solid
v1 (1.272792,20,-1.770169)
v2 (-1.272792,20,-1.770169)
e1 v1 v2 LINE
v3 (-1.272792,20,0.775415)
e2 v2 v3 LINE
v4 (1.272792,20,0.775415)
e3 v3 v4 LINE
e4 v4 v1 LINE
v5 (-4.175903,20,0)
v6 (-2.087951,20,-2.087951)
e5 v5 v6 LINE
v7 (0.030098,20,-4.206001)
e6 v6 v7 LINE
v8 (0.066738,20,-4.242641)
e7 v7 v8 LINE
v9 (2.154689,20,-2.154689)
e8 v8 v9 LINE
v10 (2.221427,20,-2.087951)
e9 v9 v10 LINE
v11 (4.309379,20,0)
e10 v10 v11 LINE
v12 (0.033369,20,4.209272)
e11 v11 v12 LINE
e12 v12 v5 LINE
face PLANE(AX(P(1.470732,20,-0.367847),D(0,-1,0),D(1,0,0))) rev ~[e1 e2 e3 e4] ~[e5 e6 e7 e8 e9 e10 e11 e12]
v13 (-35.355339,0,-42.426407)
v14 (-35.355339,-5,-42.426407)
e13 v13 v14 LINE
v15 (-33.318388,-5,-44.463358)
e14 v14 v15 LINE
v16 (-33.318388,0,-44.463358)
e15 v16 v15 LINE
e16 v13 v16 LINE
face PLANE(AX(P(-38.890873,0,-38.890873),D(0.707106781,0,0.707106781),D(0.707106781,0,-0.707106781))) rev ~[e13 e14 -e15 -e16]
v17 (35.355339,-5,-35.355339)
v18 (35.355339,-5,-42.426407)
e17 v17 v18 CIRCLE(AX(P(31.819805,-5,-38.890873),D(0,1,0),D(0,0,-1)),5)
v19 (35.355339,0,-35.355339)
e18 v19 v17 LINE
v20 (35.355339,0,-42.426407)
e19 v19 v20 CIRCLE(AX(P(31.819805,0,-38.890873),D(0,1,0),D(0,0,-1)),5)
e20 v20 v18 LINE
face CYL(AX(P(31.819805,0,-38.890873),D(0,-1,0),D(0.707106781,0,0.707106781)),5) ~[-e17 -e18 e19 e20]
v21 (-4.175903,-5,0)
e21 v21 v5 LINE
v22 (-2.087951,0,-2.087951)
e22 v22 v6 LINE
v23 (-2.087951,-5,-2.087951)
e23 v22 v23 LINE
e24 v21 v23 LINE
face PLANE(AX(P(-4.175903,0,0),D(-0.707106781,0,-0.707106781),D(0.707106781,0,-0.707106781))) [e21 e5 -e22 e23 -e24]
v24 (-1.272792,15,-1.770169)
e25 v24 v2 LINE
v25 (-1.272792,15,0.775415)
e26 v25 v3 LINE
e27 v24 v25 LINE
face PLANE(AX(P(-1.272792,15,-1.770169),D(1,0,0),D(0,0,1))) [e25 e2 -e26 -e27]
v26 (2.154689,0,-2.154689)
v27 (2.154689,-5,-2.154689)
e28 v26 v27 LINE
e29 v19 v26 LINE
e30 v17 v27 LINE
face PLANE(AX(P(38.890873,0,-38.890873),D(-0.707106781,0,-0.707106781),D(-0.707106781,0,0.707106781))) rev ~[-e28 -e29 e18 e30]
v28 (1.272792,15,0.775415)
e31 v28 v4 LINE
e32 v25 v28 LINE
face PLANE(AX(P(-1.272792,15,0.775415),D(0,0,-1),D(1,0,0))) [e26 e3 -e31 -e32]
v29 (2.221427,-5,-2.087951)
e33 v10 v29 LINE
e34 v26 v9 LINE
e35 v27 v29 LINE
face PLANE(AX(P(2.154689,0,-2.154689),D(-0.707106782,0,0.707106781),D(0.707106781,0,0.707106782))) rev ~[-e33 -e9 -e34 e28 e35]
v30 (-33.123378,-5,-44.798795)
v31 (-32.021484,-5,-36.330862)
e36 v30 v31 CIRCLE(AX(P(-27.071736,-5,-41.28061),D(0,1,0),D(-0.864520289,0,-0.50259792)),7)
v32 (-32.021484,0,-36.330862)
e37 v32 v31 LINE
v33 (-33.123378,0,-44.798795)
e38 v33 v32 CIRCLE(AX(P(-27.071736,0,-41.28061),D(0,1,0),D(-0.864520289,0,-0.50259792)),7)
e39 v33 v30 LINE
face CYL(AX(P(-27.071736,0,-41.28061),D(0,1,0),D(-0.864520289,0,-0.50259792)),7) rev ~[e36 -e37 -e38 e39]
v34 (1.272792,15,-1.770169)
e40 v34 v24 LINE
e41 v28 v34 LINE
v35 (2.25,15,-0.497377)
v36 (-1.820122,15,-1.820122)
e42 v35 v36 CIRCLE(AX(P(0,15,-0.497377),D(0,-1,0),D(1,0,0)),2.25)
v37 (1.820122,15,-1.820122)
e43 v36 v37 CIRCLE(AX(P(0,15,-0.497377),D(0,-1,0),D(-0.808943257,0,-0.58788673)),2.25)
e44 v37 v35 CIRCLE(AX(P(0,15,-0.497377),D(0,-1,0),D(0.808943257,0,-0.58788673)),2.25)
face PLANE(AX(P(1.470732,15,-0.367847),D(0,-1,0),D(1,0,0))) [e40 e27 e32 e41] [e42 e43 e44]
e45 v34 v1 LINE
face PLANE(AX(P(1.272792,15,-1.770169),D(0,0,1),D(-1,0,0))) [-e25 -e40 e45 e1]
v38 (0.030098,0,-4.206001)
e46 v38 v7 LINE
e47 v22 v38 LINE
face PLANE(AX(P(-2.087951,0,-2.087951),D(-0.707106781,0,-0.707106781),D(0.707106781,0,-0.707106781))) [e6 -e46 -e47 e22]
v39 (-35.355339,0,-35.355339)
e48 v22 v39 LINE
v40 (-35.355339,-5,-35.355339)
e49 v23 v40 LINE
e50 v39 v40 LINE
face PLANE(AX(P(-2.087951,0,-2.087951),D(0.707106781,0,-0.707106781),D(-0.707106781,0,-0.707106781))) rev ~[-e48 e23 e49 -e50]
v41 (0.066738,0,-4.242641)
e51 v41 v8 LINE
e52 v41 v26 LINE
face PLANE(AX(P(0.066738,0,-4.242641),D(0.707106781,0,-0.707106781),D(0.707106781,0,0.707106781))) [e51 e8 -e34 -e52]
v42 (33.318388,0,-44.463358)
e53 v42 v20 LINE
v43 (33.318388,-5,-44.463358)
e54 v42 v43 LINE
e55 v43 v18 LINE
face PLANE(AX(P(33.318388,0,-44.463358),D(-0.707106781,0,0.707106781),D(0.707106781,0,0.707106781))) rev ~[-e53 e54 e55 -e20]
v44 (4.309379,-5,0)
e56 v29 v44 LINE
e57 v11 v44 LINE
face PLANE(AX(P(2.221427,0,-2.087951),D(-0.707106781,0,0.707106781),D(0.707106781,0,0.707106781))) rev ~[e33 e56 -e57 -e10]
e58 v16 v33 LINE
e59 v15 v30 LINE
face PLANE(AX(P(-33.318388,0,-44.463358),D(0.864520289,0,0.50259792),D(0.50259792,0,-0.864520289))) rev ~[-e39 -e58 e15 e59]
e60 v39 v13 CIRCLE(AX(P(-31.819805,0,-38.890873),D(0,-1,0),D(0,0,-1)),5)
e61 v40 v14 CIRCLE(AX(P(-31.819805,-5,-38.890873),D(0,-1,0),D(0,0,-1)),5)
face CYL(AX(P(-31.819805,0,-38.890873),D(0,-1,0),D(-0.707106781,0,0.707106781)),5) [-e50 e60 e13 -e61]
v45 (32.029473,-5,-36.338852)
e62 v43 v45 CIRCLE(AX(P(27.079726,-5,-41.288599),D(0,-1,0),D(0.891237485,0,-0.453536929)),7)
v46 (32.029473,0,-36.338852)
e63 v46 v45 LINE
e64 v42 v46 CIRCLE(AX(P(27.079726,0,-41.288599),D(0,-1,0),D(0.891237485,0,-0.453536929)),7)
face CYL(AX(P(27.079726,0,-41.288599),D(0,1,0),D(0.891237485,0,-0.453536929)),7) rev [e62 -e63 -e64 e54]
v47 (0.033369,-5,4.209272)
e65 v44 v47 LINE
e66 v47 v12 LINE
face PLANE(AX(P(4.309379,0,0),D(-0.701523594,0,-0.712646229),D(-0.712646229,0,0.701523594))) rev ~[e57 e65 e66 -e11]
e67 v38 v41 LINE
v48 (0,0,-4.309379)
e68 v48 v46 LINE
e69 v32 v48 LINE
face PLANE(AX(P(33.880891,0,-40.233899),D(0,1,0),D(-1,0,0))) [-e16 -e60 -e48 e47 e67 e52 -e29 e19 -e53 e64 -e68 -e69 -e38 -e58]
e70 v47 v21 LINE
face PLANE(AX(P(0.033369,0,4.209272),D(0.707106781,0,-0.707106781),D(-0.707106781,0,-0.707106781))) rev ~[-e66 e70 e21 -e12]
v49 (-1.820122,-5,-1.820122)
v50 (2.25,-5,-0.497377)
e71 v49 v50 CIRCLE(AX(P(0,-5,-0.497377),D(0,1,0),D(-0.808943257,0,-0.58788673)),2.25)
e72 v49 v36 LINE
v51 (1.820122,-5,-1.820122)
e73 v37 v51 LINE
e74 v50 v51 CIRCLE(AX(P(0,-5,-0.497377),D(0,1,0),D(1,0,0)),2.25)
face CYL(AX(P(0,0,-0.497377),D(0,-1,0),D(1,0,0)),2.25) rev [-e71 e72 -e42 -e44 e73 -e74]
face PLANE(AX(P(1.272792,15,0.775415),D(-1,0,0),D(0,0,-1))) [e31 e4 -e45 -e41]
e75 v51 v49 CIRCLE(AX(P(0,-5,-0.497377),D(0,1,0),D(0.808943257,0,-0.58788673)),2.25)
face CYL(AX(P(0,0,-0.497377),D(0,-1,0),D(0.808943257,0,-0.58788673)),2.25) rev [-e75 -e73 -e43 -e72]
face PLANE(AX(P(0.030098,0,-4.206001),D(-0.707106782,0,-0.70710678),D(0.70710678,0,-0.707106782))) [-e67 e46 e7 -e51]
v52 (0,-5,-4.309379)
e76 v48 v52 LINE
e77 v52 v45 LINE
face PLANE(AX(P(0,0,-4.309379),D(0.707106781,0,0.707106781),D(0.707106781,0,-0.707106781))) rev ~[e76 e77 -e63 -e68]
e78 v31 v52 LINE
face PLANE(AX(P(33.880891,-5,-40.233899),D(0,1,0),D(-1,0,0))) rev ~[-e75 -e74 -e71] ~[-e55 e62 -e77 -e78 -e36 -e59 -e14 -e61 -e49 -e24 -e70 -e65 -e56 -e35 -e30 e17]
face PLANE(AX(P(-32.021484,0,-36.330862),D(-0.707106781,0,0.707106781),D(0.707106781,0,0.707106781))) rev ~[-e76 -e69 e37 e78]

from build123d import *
from build123d import SkipClean  # not in build123d's __all__

# Parameters (mm, degrees)
F1_DEPTH    = 5
F2_DEPTH    = 20
F3_R        = 5
F4_START    = -15
F4_DEPTH    = 5
F5_T1_DEPTH = 5


# Not quite as in the source:
# - a fillet or chamfer that OpenCascade refuses, or shapes differently, is made with other operations: its cross-section is extruded or revolved along the edge and cut away or added
# - after a boolean that leaves OpenCascade's solid faulty, fix() repairs it
# - a feature names something its author has since deleted; it is built from what else it names


with BuildPart() as f1:
    # F0 (on Front) → F1 (new body)
    with BuildSketch(Plane.XZ):
        with BuildLine():
            Line((0.0300982685, -4.2060010783), (-2.0879514049, -2.0879514049))
            Line((-2.0879514049, -2.0879514049), (-38.8908729653, -38.8908729653))
            Line((-38.8908729653, -38.8908729653), (-33.3183881591, -44.4633577714))
            Line((-33.3183881591, -44.4633577714), (-33.1233781652, -44.7987950851))
            ThreePointArc((-33.1233781652, -44.7987950851), (-34.0132139837, -40.3773459148), (-32.0214836094, -36.3308621737))
            Line((-32.0214836094, -36.3308621737), (0, -4.3093785644))
            Line((0, -4.3093785644), (0.0667378772, -4.2426406871))
            Line((0.0667378772, -4.2426406871), (0.0300982685, -4.2060010783))
        make_face()
        with BuildLine():
            Line((-4.1759028099, 0), (-2.0879514049, -2.0879514049))
            Line((-2.0879514049, -2.0879514049), (-1.8201223283, -1.8201223283))
            ThreePointArc((-1.8201223283, -1.8201223283), (-0.6954224476, 1.6424563629), (2.25, -0.4973771865))
            ThreePointArc((2.25, -0.4973771865), (2.1398335494, -1.1927996342), (1.8201223283, -1.8201223283))
            Line((1.8201223283, -1.8201223283), (2.1546892822, -2.1546892822))
            Line((2.1546892822, -2.1546892822), (2.2214271594, -2.0879514049))
            Line((2.2214271594, -2.0879514049), (4.3093785644, 0))
            Line((4.3093785644, 0), (0.0333689386, 4.2092717485))
            Line((0.0333689386, 4.2092717485), (-4.1759028099, 0))
        make_face()
        with BuildLine():
            Line((-1.8201223283, -1.8201223283), (-2.0879514049, -2.0879514049))
            Line((-2.0879514049, -2.0879514049), (0.0300982685, -4.2060010783))
            Line((0.0300982685, -4.2060010783), (0.0667378772, -4.2426406871))
            Line((0.0667378772, -4.2426406871), (2.1546892822, -2.1546892822))
            Line((2.1546892822, -2.1546892822), (1.8201223283, -1.8201223283))
            ThreePointArc((1.8201223283, -1.8201223283), (0, -2.7473771865), (-1.8201223283, -1.8201223283))
        make_face()
        Polygon((2.1546892822, -2.1546892822), (0.0667378772, -4.2426406871), (0, -4.3093785644), (35.8313777613, -40.1407563256), (33.3183881591, -44.4633577714), (38.8908729653, -38.8908729653), align=None)
    extrude(amount=F1_DEPTH)

    # F0 (on Front) → F2 (join)
    with BuildSketch(Plane.XZ):
        with BuildLine():
            Line((-4.1759028099, 0), (-2.0879514049, -2.0879514049))
            Line((-2.0879514049, -2.0879514049), (-1.8201223283, -1.8201223283))
            ThreePointArc((-1.8201223283, -1.8201223283), (-0.6954224476, 1.6424563629), (2.25, -0.4973771865))
            ThreePointArc((2.25, -0.4973771865), (2.1398335494, -1.1927996342), (1.8201223283, -1.8201223283))
            Line((1.8201223283, -1.8201223283), (2.1546892822, -2.1546892822))
            Line((2.1546892822, -2.1546892822), (2.2214271594, -2.0879514049))
            Line((2.2214271594, -2.0879514049), (4.3093785644, 0))
            Line((4.3093785644, 0), (0.0333689386, 4.2092717485))
            Line((0.0333689386, 4.2092717485), (-4.1759028099, 0))
        make_face()
        with BuildLine():
            Line((-1.8201223283, -1.8201223283), (-2.0879514049, -2.0879514049))
            Line((-2.0879514049, -2.0879514049), (0.0300982685, -4.2060010783))
            Line((0.0300982685, -4.2060010783), (0.0667378772, -4.2426406871))
            Line((0.0667378772, -4.2426406871), (2.1546892822, -2.1546892822))
            Line((2.1546892822, -2.1546892822), (1.8201223283, -1.8201223283))
            ThreePointArc((1.8201223283, -1.8201223283), (0, -2.7473771865), (-1.8201223283, -1.8201223283))
        make_face()
    with SkipClean():  # cleaning this boolean's faces spoils the solid; the shape is the same uncleaned
        extrude(amount=-F2_DEPTH)

    # F3
    f3_edges = [f1.edges().sort_by_distance(p)[0] for p in [
        (38.890873, -2.5, -38.890873),
        (-38.890873, -2.5, -38.890873),
    ]]
    fillet(f3_edges, radius=F3_R)

    # F0 (on Front) → F4 (join)
    with BuildSketch(Plane.XZ.offset(F4_START)):
        with BuildLine():
            Line((1.2727922061, -1.2727922061), (1.4969489762, -1.4969489762))
            ThreePointArc((1.4969489762, -1.4969489762), (1.7225719371, -1.0196280089), (1.8, -0.4973771865))
            ThreePointArc((1.8, -0.4973771865), (1.6629831585, 0.1914529917), (1.2727922061, 0.7754150196))
            Line((1.2727922061, 0.7754150196), (1.2727922061, -1.2727922061))
        make_face()
        with BuildLine():
            ThreePointArc((1.2727922061, -1.7701693927), (1.3915922187, -1.6390737735), (1.4969489762, -1.4969489762))
            Line((1.4969489762, -1.4969489762), (1.2727922061, -1.2727922061))
            Line((1.2727922061, -1.2727922061), (1.2727922061, -1.7701693927))
        make_face()
        with BuildLine():
            Line((-1.2727922061, -1.2727922061), (-1.4969489762, -1.4969489762))
            ThreePointArc((-1.4969489762, -1.4969489762), (-1.3915922187, -1.6390737735), (-1.2727922061, -1.7701693927))
            Line((-1.2727922061, -1.7701693927), (-1.2727922061, -1.2727922061))
        make_face()
        with BuildLine():
            Line((1.2727922061, -1.7701693927), (-1.2727922061, -1.7701693927))
            ThreePointArc((-1.2727922061, -1.7701693927), (0, -2.2973771865), (1.2727922061, -1.7701693927))
        make_face()
        with BuildLine():
            ThreePointArc((-1.2727922061, 0.7754150196), (-1.7913056932, -0.3206742907), (-1.4969489762, -1.4969489762))
            Line((-1.4969489762, -1.4969489762), (-1.2727922061, -1.2727922061))
            Line((-1.2727922061, -1.2727922061), (-1.2727922061, 0.7754150196))
        make_face()
        with BuildLine():
            ThreePointArc((1.2727922061, 0.7754150196), (0, 1.3026228135), (-1.2727922061, 0.7754150196))
            Line((-1.2727922061, 0.7754150196), (1.2727922061, 0.7754150196))
        make_face()
        with BuildLine():
            ThreePointArc((2.25, -0.4973771865), (-0.6954224476, 1.6424563629), (-1.8201223283, -1.8201223283))
            Line((-1.8201223283, -1.8201223283), (-1.4969489762, -1.4969489762))
            ThreePointArc((-1.4969489762, -1.4969489762), (-1.7913056932, -0.3206742907), (-1.2727922061, 0.7754150196))
            ThreePointArc((-1.2727922061, 0.7754150196), (0, 1.3026228135), (1.2727922061, 0.7754150196))
            ThreePointArc((1.2727922061, 0.7754150196), (1.6629831585, 0.1914529917), (1.8, -0.4973771865))
            ThreePointArc((1.8, -0.4973771865), (1.7225719371, -1.0196280089), (1.4969489762, -1.4969489762))
            Line((1.4969489762, -1.4969489762), (1.8201223283, -1.8201223283))
            ThreePointArc((1.8201223283, -1.8201223283), (2.1398335494, -1.1927996342), (2.25, -0.4973771865))
        make_face()
        with BuildLine():
            Line((-1.4969489762, -1.4969489762), (-1.8201223283, -1.8201223283))
            ThreePointArc((-1.8201223283, -1.8201223283), (0, -2.7473771865), (1.8201223283, -1.8201223283))
            Line((1.8201223283, -1.8201223283), (1.4969489762, -1.4969489762))
            ThreePointArc((1.4969489762, -1.4969489762), (1.3915922187, -1.6390737735), (1.2727922061, -1.7701693927))
            ThreePointArc((1.2727922061, -1.7701693927), (0, -2.2973771865), (-1.2727922061, -1.7701693927))
            ThreePointArc((-1.2727922061, -1.7701693927), (-1.3915922187, -1.6390737735), (-1.4969489762, -1.4969489762))
        make_face()
    extrude(amount=-F4_DEPTH)

    add(f1.part.fix(), mode=Mode.REPLACE)

    # F5: fillet of radius 7 on 1 edges, made by hand

    # F5_s2 → F5_t1 (join)
    with BuildSketch(Plane.XZ):
        with BuildLine():
            ThreePointArc((33.3183881591, -44.4633577714), (33.9932652456, -40.1917985218), (32.0294732352, -36.3388517995))
            Line((32.0294732352, -36.3388517995), (35.8313777613, -40.1407563256))
            Line((35.8313777613, -40.1407563256), (33.3183881591, -44.4633577714))
        make_face()
    extrude(amount=F5_T1_DEPTH)


solid = f1.part
